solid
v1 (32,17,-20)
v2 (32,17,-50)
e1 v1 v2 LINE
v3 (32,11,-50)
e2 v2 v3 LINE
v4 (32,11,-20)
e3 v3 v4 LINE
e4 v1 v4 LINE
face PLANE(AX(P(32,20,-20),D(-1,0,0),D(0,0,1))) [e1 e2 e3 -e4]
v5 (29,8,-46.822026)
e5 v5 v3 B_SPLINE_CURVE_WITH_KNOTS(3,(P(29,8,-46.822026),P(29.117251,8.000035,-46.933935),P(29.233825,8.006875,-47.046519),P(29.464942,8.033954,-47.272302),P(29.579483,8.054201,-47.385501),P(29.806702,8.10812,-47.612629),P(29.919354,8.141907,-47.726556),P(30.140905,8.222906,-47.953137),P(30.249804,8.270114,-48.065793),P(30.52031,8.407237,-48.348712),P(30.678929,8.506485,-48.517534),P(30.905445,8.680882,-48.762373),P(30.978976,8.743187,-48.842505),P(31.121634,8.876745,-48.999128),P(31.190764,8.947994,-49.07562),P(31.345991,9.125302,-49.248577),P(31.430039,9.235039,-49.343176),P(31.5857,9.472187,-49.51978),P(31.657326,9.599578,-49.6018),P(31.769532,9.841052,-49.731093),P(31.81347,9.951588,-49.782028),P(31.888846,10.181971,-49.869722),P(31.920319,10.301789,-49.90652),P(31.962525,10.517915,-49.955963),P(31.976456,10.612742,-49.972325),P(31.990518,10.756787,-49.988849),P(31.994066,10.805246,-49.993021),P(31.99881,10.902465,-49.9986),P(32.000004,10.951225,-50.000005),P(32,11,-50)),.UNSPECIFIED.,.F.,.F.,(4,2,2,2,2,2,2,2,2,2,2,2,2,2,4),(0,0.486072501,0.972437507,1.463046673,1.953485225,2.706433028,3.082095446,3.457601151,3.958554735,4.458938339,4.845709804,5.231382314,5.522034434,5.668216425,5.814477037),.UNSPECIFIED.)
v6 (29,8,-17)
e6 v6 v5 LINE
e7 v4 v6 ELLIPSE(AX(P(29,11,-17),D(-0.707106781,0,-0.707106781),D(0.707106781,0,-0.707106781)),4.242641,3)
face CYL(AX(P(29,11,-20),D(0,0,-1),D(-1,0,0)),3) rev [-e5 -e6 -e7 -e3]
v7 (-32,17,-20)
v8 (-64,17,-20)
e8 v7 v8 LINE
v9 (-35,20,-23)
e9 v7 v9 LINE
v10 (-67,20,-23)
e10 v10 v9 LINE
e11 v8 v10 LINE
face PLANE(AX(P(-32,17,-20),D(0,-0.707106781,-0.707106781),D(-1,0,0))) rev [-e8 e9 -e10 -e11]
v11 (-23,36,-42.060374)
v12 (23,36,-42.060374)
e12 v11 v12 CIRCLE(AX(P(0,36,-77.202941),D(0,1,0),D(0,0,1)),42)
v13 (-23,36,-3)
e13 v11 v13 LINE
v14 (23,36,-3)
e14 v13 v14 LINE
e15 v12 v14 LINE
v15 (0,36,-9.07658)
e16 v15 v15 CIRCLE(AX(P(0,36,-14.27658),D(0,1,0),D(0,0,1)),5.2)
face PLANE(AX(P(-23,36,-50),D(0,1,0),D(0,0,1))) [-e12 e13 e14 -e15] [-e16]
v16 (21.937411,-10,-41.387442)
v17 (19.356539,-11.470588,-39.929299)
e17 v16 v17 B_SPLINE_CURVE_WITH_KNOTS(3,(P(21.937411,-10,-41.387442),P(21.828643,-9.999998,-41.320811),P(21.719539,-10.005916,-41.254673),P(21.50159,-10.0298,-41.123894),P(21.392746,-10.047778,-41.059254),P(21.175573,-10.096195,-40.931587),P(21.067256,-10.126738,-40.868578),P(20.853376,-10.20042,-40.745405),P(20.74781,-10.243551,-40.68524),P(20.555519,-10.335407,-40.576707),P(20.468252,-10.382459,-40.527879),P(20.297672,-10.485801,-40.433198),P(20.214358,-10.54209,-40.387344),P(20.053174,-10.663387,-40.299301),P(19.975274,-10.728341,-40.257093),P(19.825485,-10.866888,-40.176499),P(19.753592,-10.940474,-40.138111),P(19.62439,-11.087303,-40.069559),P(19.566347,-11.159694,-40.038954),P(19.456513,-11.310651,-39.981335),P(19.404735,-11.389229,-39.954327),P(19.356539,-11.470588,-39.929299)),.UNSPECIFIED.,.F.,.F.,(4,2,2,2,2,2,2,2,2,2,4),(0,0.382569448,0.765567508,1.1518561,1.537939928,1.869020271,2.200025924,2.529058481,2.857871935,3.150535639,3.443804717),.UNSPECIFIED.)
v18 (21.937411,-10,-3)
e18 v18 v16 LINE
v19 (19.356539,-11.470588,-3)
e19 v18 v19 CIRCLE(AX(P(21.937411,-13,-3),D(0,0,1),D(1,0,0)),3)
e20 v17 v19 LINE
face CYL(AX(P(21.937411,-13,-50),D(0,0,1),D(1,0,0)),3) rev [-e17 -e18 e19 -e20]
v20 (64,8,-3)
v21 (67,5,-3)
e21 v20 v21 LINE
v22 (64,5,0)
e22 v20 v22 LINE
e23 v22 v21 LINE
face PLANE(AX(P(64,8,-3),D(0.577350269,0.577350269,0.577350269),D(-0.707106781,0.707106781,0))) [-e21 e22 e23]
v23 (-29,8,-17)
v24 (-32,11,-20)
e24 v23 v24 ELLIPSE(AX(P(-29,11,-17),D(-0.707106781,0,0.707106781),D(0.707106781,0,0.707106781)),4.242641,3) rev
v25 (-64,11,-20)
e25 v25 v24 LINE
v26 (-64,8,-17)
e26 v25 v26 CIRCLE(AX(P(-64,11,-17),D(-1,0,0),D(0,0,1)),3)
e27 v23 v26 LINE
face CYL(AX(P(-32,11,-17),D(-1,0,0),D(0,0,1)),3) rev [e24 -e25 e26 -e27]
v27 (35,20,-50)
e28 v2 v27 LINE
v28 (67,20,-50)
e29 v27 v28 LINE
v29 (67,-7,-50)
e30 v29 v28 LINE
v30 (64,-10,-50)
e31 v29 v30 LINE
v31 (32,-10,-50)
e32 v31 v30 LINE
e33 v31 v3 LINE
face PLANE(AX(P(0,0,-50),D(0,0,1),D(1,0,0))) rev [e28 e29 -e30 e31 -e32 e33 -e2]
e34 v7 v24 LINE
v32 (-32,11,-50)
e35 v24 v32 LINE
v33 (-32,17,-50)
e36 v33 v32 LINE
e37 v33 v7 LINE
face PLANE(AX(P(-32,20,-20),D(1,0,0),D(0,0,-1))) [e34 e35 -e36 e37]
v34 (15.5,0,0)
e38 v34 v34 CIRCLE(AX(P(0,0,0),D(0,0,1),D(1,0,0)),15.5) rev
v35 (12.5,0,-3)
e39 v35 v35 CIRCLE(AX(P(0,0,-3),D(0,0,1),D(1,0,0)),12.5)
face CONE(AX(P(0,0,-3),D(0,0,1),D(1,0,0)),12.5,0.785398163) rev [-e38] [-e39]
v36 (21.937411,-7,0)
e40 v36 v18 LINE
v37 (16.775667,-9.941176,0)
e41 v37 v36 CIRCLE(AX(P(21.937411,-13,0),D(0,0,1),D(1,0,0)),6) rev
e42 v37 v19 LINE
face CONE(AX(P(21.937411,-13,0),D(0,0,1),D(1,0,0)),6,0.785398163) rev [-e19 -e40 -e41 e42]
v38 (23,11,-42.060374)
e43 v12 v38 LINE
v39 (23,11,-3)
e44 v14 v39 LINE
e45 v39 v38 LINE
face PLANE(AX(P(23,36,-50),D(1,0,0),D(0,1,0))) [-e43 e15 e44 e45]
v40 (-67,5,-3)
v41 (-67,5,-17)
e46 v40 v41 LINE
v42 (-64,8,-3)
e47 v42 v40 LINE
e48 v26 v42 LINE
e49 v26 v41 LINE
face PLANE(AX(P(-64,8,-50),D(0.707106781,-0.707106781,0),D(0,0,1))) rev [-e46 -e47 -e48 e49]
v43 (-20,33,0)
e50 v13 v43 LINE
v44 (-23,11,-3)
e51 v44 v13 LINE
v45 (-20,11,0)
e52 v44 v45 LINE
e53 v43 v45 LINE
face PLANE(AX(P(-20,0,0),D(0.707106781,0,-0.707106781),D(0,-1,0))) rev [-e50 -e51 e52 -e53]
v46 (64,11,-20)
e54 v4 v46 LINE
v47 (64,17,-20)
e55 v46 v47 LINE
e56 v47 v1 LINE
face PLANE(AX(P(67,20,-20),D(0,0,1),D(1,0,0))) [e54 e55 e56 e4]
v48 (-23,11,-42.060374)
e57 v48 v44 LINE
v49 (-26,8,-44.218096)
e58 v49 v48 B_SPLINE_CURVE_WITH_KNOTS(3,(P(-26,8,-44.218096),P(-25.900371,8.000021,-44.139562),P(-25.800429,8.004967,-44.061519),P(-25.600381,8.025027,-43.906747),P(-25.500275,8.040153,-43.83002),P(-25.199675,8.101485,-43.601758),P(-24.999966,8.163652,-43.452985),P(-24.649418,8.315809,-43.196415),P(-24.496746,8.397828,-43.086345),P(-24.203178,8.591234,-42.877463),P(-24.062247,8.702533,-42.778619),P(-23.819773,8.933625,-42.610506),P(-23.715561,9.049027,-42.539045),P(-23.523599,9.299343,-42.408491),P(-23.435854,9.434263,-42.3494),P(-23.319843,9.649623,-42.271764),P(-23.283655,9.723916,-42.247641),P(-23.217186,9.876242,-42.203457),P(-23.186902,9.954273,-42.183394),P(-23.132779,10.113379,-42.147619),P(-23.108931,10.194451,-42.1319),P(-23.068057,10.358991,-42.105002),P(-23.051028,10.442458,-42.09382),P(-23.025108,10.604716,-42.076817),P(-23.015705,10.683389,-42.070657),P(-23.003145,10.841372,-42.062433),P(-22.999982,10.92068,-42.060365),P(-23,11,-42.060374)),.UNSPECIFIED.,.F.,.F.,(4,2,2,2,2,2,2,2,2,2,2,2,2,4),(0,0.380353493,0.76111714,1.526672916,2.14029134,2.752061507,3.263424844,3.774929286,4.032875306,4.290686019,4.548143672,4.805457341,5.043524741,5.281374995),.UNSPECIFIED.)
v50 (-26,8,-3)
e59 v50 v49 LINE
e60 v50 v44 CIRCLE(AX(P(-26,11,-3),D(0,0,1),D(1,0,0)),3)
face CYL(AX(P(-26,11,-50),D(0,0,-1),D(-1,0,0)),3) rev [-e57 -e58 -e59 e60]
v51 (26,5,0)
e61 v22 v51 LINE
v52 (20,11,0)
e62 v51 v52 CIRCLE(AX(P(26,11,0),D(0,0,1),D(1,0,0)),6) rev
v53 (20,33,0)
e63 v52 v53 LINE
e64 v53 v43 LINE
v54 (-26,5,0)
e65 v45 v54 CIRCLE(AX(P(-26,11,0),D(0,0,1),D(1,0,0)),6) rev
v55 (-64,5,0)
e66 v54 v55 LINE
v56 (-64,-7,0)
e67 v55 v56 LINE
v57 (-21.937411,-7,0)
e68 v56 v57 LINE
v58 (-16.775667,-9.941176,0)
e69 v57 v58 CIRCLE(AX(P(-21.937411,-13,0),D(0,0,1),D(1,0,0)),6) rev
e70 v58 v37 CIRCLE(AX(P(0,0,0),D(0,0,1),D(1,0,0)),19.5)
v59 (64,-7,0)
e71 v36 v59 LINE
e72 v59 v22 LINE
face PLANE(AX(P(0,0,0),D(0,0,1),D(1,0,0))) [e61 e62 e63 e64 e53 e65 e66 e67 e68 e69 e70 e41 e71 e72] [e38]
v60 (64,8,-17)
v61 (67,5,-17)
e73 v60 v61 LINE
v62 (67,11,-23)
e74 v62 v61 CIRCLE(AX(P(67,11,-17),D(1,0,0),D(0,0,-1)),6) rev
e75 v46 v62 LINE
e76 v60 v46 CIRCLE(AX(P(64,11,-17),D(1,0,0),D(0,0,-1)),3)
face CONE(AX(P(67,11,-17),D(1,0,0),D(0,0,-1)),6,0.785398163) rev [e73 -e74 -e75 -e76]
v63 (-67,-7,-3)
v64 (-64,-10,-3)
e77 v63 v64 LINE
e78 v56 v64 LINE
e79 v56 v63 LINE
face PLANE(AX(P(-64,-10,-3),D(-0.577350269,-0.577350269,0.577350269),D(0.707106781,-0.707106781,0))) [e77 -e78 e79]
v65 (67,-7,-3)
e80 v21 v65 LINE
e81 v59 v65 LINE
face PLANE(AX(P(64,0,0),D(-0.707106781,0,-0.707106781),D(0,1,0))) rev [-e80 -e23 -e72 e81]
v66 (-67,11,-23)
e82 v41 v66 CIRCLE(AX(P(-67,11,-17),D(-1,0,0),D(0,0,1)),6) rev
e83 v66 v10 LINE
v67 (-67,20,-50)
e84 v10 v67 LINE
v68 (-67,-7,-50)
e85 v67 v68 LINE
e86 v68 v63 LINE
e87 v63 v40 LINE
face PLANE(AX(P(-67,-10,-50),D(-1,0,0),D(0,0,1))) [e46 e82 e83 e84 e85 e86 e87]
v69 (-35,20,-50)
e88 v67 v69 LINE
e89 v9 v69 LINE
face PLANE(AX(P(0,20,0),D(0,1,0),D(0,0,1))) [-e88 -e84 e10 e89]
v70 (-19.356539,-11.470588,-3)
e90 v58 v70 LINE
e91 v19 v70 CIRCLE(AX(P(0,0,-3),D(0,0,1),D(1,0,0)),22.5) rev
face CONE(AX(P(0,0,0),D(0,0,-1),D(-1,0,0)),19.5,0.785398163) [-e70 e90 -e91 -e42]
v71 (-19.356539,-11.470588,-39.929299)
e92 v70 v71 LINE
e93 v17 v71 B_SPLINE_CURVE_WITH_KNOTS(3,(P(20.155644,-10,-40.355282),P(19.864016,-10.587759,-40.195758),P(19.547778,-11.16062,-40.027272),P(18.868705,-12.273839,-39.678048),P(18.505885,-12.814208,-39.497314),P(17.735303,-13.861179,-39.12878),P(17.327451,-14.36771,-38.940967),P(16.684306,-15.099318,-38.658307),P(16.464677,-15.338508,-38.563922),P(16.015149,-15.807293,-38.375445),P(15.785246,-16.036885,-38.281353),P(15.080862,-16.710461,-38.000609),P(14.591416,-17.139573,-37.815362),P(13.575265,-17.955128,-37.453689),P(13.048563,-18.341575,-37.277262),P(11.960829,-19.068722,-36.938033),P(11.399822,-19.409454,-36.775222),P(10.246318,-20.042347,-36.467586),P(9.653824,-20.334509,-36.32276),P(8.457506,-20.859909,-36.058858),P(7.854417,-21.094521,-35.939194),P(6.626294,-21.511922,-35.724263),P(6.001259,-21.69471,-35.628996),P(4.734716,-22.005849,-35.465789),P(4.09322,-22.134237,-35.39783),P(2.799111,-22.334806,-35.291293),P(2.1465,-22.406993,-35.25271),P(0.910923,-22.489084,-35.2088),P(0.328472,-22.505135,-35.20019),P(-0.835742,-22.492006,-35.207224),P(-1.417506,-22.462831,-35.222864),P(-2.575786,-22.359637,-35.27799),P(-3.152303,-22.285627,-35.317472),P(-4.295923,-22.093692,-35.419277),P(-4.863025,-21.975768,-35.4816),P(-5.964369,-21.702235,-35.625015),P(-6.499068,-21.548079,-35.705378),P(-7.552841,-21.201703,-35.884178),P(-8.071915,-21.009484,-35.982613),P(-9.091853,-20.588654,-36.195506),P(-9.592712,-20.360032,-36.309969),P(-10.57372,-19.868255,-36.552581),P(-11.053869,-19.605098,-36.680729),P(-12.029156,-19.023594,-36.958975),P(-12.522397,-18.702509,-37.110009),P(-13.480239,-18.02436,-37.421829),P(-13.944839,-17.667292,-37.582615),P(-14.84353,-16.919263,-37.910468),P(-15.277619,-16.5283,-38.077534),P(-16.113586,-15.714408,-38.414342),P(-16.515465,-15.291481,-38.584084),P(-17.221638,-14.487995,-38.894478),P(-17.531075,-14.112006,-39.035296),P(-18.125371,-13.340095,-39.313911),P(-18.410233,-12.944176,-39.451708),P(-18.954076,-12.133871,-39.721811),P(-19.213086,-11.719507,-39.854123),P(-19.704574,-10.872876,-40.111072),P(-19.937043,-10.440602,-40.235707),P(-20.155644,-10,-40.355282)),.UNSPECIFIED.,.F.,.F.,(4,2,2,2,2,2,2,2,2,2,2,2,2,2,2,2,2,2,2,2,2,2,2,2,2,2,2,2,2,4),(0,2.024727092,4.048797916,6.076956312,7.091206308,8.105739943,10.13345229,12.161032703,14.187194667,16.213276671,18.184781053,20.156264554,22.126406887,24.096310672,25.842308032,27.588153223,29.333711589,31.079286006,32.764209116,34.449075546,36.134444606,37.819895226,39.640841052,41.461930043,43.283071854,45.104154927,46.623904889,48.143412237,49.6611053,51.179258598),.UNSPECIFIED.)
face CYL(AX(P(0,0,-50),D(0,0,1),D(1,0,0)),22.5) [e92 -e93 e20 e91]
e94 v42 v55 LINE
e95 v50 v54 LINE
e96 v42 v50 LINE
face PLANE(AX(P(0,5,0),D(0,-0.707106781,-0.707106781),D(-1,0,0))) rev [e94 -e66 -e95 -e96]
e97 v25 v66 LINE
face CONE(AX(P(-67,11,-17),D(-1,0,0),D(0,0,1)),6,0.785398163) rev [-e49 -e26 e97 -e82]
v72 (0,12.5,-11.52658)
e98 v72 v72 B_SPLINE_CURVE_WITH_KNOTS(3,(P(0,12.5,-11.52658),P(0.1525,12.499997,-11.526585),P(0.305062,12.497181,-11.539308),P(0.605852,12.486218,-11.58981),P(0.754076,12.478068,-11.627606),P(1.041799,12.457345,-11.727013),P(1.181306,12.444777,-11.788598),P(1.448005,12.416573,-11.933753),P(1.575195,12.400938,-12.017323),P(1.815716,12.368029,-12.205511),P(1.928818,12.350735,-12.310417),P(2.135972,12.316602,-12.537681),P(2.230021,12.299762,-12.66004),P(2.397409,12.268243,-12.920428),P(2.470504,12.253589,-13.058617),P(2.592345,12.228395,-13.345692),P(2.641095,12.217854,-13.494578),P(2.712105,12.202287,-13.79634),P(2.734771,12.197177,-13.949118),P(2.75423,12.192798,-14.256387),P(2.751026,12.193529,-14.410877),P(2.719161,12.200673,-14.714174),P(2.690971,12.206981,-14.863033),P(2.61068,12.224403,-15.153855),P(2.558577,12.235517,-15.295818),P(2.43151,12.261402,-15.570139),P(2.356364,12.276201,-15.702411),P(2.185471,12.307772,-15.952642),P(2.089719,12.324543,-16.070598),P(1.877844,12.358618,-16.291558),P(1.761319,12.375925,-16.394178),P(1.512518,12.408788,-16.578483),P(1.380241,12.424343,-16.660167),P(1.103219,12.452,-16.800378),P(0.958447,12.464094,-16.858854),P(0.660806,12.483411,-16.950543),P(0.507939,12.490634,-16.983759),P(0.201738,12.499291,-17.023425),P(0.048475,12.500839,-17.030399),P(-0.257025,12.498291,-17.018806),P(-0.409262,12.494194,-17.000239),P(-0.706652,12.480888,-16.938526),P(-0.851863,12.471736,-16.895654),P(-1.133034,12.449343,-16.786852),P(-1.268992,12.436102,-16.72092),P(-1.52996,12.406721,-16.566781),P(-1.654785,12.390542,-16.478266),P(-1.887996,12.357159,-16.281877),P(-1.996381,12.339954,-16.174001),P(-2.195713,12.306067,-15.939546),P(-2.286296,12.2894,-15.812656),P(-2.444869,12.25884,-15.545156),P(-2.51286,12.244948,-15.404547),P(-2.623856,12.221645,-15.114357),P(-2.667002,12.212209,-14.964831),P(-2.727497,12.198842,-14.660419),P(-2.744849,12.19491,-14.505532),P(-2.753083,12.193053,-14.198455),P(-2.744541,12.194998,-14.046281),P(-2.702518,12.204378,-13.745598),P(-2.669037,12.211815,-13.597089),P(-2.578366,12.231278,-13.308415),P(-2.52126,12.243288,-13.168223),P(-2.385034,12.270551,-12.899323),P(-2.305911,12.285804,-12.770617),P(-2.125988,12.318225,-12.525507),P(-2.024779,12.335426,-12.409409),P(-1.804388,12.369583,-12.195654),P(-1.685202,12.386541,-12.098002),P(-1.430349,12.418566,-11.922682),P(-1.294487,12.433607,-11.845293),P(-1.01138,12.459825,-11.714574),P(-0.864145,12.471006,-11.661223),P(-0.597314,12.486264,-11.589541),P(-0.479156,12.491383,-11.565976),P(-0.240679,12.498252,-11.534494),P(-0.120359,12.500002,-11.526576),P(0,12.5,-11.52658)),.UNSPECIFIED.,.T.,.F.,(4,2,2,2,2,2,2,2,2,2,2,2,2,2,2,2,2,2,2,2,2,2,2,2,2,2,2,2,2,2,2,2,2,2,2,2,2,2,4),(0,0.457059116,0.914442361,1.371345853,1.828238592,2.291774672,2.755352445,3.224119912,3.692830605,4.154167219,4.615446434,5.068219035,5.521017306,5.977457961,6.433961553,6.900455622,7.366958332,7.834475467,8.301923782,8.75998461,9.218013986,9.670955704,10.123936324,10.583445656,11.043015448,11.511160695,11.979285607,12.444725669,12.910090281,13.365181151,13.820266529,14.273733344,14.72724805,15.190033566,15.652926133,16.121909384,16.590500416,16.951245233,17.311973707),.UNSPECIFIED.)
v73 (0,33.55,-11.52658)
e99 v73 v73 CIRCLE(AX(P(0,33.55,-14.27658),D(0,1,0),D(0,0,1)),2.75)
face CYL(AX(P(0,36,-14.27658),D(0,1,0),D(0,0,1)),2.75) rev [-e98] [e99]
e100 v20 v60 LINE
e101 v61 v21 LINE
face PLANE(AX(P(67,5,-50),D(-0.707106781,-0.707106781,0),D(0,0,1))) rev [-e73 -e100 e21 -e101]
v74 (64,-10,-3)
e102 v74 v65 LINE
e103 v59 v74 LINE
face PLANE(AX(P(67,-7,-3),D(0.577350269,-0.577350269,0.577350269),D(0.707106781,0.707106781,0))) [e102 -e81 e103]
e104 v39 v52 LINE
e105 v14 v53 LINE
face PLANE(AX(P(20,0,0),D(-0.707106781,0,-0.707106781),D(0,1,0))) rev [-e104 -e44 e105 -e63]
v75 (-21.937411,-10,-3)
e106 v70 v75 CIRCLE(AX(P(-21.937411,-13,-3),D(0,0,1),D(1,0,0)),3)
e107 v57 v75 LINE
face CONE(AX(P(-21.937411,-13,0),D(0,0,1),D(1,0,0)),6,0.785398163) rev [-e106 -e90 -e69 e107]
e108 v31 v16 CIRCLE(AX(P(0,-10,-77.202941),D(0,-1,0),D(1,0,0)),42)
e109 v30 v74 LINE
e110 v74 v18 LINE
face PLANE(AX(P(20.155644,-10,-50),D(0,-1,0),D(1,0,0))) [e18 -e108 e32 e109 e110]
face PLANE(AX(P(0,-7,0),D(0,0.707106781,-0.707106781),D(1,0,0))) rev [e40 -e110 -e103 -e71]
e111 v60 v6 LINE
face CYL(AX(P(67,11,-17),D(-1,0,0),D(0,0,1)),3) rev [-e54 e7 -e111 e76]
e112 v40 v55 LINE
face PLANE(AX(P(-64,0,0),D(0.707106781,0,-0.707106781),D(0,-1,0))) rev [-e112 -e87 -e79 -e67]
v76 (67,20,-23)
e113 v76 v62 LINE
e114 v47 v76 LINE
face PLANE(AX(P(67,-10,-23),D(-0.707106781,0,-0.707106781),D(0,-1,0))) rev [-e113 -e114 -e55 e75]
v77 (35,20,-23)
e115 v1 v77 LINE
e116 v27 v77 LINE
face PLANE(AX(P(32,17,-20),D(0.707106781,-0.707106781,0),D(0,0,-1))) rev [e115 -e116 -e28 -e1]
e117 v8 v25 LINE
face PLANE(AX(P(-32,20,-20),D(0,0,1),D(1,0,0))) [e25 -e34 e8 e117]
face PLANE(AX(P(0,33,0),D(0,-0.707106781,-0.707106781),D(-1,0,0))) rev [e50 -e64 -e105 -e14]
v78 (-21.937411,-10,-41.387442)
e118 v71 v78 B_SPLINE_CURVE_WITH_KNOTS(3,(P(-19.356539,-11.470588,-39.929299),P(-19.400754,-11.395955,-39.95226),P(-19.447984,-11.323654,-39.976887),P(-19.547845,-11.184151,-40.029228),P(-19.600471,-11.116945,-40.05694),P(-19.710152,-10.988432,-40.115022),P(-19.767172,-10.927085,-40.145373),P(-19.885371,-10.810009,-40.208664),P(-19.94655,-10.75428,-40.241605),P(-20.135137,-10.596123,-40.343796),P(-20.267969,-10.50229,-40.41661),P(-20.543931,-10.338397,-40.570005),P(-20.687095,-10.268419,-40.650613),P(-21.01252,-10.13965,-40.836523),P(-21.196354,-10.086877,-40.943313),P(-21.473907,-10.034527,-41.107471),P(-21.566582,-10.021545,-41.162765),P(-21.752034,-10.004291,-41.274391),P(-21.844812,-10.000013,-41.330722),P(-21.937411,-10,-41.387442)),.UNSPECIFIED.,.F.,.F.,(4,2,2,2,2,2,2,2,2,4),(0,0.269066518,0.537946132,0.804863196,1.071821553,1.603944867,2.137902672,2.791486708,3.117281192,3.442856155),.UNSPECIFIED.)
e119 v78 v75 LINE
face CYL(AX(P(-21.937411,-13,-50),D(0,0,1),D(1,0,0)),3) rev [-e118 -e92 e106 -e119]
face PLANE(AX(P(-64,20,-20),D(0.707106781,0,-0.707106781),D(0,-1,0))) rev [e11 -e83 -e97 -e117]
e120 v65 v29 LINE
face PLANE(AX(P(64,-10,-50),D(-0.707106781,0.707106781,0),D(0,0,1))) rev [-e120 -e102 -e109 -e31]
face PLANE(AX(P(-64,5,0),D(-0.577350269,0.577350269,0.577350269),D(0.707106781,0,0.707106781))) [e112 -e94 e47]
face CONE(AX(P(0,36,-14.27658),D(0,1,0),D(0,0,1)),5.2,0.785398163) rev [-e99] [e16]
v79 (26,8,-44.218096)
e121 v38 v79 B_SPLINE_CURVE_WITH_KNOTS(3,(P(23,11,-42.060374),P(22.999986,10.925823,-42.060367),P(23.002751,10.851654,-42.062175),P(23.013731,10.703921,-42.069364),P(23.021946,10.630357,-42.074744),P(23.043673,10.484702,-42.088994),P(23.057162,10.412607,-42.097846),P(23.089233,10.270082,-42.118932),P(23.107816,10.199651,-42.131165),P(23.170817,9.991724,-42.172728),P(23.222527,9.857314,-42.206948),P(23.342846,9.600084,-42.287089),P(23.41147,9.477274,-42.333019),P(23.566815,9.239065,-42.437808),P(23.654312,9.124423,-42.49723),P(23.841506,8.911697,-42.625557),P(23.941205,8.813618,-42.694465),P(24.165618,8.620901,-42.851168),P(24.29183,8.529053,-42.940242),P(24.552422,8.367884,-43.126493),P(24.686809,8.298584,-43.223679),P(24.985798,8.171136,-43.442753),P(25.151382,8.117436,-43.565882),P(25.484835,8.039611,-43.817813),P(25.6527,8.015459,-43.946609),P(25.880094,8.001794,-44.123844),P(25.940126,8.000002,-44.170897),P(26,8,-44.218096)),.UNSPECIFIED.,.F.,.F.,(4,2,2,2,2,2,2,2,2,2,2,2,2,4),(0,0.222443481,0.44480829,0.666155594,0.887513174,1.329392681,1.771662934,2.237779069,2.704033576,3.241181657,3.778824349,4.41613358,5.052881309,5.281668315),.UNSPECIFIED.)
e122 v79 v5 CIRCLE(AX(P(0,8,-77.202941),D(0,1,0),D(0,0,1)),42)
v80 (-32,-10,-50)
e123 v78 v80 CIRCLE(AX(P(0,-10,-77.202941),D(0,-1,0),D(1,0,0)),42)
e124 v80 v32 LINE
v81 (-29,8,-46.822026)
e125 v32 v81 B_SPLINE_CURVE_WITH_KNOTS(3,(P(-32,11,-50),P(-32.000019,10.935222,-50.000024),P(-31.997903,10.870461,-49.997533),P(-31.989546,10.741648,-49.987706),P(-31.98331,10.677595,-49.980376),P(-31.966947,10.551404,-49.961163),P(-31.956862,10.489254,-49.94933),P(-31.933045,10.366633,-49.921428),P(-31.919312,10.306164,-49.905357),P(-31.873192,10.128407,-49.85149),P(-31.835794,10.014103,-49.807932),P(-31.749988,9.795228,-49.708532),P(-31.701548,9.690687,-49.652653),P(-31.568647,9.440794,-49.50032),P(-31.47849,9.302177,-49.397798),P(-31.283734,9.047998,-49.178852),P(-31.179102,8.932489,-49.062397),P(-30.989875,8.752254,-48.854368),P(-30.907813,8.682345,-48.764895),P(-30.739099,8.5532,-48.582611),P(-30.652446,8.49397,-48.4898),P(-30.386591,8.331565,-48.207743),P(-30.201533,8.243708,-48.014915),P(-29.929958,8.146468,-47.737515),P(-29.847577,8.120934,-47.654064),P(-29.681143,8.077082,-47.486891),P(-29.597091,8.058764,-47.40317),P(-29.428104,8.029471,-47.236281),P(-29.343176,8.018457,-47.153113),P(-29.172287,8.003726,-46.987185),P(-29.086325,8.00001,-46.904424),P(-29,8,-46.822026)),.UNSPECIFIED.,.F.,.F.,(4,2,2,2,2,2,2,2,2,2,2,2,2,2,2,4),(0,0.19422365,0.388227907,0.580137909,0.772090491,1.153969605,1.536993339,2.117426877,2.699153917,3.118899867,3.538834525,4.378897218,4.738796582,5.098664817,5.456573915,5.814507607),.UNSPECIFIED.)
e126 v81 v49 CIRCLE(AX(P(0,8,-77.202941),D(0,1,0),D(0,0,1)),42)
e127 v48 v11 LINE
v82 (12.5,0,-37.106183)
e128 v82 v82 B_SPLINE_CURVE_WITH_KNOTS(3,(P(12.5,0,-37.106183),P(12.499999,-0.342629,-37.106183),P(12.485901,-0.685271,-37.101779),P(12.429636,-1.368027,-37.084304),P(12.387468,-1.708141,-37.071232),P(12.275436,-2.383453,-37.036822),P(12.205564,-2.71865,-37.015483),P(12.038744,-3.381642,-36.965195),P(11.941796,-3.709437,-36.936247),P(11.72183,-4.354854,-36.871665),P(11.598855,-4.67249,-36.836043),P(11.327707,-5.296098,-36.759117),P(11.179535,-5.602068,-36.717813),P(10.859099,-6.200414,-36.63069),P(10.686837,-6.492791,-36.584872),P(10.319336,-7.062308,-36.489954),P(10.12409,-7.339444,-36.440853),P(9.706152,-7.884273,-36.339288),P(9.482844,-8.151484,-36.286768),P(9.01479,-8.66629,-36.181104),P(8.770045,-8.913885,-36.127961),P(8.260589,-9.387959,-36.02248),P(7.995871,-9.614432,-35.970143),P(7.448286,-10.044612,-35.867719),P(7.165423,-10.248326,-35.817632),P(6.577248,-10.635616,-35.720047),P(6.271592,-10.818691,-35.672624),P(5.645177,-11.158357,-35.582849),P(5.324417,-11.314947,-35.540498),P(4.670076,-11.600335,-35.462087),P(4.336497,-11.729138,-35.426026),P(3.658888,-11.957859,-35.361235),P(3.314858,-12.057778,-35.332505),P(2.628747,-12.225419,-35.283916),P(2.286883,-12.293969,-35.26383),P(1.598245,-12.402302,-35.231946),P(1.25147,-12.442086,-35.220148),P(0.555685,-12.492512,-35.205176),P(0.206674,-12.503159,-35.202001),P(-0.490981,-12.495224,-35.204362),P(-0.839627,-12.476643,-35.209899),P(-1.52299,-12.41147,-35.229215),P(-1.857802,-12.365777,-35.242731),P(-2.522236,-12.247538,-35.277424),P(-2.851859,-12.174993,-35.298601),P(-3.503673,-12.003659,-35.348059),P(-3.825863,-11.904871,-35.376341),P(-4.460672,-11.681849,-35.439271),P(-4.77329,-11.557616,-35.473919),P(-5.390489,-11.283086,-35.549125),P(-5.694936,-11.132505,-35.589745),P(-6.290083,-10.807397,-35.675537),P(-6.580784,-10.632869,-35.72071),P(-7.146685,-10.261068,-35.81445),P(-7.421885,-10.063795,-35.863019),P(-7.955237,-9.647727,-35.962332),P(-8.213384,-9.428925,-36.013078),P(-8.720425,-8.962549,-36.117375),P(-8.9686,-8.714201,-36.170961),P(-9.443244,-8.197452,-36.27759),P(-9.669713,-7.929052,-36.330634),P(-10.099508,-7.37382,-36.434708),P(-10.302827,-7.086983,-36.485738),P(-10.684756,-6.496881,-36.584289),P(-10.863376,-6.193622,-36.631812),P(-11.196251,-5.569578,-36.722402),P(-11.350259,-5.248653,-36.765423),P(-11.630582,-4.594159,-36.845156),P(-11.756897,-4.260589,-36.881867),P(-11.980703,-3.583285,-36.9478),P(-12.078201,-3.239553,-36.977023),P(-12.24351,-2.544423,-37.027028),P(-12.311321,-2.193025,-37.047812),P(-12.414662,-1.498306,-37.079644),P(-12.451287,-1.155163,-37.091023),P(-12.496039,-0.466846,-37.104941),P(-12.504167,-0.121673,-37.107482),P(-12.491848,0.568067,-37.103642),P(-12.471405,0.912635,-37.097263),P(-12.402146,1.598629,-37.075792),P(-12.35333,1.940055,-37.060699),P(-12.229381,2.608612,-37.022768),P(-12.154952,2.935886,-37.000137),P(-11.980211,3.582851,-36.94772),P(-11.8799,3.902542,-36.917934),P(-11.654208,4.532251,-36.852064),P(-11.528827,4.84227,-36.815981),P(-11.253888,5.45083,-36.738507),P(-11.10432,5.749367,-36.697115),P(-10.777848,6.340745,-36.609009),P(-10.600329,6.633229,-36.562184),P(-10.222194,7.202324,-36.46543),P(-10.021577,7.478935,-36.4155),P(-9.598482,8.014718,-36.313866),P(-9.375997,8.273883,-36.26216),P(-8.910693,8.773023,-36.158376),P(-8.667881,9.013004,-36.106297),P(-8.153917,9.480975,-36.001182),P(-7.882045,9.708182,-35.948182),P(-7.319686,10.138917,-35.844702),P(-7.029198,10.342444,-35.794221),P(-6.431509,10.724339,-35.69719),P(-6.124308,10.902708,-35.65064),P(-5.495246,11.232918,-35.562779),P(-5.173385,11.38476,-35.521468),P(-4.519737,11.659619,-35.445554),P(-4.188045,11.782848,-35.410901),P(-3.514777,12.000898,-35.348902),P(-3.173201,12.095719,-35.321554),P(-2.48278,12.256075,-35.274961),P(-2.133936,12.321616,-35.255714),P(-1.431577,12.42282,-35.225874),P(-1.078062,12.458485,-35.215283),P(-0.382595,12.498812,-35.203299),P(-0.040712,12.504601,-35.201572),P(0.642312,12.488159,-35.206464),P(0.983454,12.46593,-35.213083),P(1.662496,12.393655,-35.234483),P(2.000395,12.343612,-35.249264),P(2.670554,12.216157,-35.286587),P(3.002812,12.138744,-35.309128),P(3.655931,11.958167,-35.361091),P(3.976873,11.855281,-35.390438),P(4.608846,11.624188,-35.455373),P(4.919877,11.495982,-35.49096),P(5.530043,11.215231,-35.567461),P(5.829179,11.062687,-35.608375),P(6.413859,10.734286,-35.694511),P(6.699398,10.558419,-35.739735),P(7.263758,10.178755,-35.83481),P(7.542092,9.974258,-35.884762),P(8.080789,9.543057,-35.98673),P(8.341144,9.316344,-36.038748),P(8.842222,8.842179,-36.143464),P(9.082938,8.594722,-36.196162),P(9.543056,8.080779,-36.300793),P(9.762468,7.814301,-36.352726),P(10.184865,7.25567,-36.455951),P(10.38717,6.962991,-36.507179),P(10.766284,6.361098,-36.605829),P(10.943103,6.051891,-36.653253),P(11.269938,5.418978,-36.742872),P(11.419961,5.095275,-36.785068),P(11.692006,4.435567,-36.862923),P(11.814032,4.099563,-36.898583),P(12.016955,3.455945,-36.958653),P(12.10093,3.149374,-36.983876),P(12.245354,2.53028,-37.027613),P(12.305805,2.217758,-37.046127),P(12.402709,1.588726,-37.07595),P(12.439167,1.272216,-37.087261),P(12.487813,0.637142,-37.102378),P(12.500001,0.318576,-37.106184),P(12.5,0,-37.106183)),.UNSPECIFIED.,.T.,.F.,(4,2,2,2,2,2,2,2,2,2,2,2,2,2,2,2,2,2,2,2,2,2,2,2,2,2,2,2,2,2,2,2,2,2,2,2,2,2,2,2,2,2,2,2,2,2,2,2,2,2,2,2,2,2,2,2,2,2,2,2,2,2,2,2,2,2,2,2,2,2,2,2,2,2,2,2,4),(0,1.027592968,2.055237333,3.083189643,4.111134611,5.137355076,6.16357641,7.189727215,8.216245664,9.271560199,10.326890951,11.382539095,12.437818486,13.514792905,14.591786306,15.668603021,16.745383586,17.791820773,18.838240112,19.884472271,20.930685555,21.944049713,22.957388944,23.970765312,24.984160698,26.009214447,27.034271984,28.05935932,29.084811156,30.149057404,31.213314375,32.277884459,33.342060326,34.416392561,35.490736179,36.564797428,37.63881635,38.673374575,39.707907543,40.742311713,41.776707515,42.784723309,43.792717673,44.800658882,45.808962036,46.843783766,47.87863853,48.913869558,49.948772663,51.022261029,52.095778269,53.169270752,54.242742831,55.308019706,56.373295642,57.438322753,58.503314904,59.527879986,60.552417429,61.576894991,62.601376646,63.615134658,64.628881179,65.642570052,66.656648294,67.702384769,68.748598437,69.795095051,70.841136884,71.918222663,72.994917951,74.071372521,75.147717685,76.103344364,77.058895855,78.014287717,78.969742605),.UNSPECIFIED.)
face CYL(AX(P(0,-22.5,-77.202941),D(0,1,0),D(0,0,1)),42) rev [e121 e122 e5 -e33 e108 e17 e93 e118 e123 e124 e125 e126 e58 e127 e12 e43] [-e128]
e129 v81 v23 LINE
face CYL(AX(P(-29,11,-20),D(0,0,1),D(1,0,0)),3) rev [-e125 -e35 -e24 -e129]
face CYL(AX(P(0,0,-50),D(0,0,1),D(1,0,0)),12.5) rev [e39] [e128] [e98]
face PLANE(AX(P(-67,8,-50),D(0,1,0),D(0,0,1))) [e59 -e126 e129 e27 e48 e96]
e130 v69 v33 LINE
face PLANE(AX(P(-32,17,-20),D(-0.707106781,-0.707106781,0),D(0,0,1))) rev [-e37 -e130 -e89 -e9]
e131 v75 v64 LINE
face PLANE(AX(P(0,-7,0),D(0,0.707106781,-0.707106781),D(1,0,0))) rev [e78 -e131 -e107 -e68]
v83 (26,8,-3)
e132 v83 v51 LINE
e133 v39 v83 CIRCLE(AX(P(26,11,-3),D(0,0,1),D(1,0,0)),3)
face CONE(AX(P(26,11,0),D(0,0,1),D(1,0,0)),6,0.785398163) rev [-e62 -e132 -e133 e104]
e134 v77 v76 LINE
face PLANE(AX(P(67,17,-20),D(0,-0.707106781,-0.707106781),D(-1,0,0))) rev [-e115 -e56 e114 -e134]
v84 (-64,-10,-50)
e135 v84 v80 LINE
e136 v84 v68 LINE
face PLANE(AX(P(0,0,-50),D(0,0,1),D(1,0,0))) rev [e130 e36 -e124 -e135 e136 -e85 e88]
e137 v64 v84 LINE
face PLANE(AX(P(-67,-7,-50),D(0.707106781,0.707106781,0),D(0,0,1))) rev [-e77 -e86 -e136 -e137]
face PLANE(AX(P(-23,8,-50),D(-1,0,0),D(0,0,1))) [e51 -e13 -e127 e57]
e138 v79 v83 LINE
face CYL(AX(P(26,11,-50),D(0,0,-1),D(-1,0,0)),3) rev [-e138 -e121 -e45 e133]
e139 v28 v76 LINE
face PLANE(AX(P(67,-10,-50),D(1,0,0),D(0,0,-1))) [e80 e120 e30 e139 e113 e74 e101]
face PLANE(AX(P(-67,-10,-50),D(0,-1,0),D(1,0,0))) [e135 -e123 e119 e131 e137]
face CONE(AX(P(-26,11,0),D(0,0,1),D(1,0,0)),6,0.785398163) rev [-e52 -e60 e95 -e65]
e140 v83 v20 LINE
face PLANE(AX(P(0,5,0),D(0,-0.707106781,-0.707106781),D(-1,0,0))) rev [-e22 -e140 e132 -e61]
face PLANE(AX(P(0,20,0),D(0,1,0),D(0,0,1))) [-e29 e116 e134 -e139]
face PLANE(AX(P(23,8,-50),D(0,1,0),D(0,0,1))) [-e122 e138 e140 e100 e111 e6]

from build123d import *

# Parameters (mm, degrees)
SKETCH1_R               = 12.5
BOSS_EXTRUDE1_DEPTH     = 50
SKETCH2_W               = 35
SKETCH2_H               = 30
BOSS_EXTRUDE2_DEPTH     = 30
CUT_EXTRUDE1_DEPTH      = 92.021975369
CUT_EXTRUDE1_DEPTH_BACK = 92.021975369
FILLET2_R               = 3
CHAMFER1_SIZE           = 3


# Read off the part's stored shape, not the designer's step: Ø5.5 (5.5) Diameter Hole1
with BuildPart() as part:
    # Sketch1 → Boss-Extrude1 (new body)
    with BuildSketch(Plane.XY):
        with BuildLine():
            Line((23, 8), (67, 8))
            Line((67, 8), (67, -10))
            Line((67, -10), (20.155644371, -10))
            ThreePointArc((20.155644371, -10), (0, -22.5), (-20.155644371, -10))
            Line((-20.155644371, -10), (-67, -10))
            Line((-67, -10), (-67, 8))
            Line((-67, 8), (-23, 8))
            Line((-23, 8), (-23, 36))
            Line((-23, 36), (23, 36))
            Line((23, 36), (23, 8))
        make_face()
        Circle(SKETCH1_R, mode=Mode.SUBTRACT)
    extrude(amount=-BOSS_EXTRUDE1_DEPTH)

    # Sketch2 → Boss-Extrude2 (add)
    with BuildSketch(Plane.XZ.offset(10)):
        with Locations((49.5, -35)):
            Rectangle(SKETCH2_W, SKETCH2_H)
        with Locations((-49.5, -35)):
            Rectangle(SKETCH2_W, SKETCH2_H)
    extrude(amount=-BOSS_EXTRUDE2_DEPTH)

    # Sketch3 → Cut-Extrude1 (cut, two sides: drawn at the far end of the back side and taken through both)
    with BuildSketch(Plane(origin=(0, 0, 0), x_dir=(1, 0, 0), z_dir=(0, 1, 0)).offset(-CUT_EXTRUDE1_DEPTH_BACK)):
        with BuildLine():
            Line((-32, 50), (-32, 55))
            Line((-32, 55), (32, 55))
            Line((32, 55), (32, 50))
            ThreePointArc((32, 50), (0, 35.202941017), (-32, 50))
        make_face()
    extrude(amount=CUT_EXTRUDE1_DEPTH + CUT_EXTRUDE1_DEPTH_BACK, mode=Mode.SUBTRACT)

    # Ø5.5 (5.5) Diameter Hole1 outline → Ø5.5 (5.5) Diameter Hole1 (revolve, cut)
    with BuildSketch(Plane.XY.offset(-14.276580189)):
        Polygon((0, 12.193702386), (2.75, 12.193702386), (2.75, 33.55), (5.2, 36), (0, 36), align=None)
    revolve(axis=Axis((0, 0, -14.276580189), (0, 1, 0)), mode=Mode.SUBTRACT)

    # Fillet2
    fillet2_edges = [part.edges().sort_by_distance(p)[0] for p in [
        (49.5, 8, -20),
        (-49.5, 8, -20),
        (-32, 8, -35),
        (32, 8, -35),
        (23, 8, -21.030187118),
        (-23, 8, -21.030187118),
        (20.155644371, -10, -20.177640831),
        (-20.155644371, -10, -20.177640831),
    ]]
    fillet(fillet2_edges, radius=FILLET2_R)

    # Chamfer1
    chamfer1_edges = [part.edges().sort_by_distance(p)[0] for p in [
        (-23, 23.5, 0),
        (0, 36, 0),
        (46.5, 8, 0),
        (67, -1, 0),
        (67, 8, -8.5),
        (-67, 8, -8.5),
        (-46.5, 8, 0),
        (23, 23.5, 0),
        (0, -22.5, 0),
        (-44.468705484, -10, 0),
        (44.468705484, -10, 0),
        (67, 8.878679656, -19.121320344),
        (-67, 8.878679656, -19.121320344),
        (-67, -1, 0),
        (23.878679656, 8.878679656, 0),
        (-23.878679656, 8.878679656, 0),
        (20.452189654, -10.393447172, 0),
        (-20.452189654, -10.393447172, 0),
        (67, -10, -25),
        (-67, -10, -25),
        (-12.5, 0, 0),
        (67, 15.5, -20),
        (32, 20, -35),
        (49.5, 20, -20),
        (-32, 20, -35),
        (-67, 15.5, -20),
        (-49.5, 20, -20),
    ]]
    chamfer(chamfer1_edges, length=CHAMFER1_SIZE)


solid = part.part
